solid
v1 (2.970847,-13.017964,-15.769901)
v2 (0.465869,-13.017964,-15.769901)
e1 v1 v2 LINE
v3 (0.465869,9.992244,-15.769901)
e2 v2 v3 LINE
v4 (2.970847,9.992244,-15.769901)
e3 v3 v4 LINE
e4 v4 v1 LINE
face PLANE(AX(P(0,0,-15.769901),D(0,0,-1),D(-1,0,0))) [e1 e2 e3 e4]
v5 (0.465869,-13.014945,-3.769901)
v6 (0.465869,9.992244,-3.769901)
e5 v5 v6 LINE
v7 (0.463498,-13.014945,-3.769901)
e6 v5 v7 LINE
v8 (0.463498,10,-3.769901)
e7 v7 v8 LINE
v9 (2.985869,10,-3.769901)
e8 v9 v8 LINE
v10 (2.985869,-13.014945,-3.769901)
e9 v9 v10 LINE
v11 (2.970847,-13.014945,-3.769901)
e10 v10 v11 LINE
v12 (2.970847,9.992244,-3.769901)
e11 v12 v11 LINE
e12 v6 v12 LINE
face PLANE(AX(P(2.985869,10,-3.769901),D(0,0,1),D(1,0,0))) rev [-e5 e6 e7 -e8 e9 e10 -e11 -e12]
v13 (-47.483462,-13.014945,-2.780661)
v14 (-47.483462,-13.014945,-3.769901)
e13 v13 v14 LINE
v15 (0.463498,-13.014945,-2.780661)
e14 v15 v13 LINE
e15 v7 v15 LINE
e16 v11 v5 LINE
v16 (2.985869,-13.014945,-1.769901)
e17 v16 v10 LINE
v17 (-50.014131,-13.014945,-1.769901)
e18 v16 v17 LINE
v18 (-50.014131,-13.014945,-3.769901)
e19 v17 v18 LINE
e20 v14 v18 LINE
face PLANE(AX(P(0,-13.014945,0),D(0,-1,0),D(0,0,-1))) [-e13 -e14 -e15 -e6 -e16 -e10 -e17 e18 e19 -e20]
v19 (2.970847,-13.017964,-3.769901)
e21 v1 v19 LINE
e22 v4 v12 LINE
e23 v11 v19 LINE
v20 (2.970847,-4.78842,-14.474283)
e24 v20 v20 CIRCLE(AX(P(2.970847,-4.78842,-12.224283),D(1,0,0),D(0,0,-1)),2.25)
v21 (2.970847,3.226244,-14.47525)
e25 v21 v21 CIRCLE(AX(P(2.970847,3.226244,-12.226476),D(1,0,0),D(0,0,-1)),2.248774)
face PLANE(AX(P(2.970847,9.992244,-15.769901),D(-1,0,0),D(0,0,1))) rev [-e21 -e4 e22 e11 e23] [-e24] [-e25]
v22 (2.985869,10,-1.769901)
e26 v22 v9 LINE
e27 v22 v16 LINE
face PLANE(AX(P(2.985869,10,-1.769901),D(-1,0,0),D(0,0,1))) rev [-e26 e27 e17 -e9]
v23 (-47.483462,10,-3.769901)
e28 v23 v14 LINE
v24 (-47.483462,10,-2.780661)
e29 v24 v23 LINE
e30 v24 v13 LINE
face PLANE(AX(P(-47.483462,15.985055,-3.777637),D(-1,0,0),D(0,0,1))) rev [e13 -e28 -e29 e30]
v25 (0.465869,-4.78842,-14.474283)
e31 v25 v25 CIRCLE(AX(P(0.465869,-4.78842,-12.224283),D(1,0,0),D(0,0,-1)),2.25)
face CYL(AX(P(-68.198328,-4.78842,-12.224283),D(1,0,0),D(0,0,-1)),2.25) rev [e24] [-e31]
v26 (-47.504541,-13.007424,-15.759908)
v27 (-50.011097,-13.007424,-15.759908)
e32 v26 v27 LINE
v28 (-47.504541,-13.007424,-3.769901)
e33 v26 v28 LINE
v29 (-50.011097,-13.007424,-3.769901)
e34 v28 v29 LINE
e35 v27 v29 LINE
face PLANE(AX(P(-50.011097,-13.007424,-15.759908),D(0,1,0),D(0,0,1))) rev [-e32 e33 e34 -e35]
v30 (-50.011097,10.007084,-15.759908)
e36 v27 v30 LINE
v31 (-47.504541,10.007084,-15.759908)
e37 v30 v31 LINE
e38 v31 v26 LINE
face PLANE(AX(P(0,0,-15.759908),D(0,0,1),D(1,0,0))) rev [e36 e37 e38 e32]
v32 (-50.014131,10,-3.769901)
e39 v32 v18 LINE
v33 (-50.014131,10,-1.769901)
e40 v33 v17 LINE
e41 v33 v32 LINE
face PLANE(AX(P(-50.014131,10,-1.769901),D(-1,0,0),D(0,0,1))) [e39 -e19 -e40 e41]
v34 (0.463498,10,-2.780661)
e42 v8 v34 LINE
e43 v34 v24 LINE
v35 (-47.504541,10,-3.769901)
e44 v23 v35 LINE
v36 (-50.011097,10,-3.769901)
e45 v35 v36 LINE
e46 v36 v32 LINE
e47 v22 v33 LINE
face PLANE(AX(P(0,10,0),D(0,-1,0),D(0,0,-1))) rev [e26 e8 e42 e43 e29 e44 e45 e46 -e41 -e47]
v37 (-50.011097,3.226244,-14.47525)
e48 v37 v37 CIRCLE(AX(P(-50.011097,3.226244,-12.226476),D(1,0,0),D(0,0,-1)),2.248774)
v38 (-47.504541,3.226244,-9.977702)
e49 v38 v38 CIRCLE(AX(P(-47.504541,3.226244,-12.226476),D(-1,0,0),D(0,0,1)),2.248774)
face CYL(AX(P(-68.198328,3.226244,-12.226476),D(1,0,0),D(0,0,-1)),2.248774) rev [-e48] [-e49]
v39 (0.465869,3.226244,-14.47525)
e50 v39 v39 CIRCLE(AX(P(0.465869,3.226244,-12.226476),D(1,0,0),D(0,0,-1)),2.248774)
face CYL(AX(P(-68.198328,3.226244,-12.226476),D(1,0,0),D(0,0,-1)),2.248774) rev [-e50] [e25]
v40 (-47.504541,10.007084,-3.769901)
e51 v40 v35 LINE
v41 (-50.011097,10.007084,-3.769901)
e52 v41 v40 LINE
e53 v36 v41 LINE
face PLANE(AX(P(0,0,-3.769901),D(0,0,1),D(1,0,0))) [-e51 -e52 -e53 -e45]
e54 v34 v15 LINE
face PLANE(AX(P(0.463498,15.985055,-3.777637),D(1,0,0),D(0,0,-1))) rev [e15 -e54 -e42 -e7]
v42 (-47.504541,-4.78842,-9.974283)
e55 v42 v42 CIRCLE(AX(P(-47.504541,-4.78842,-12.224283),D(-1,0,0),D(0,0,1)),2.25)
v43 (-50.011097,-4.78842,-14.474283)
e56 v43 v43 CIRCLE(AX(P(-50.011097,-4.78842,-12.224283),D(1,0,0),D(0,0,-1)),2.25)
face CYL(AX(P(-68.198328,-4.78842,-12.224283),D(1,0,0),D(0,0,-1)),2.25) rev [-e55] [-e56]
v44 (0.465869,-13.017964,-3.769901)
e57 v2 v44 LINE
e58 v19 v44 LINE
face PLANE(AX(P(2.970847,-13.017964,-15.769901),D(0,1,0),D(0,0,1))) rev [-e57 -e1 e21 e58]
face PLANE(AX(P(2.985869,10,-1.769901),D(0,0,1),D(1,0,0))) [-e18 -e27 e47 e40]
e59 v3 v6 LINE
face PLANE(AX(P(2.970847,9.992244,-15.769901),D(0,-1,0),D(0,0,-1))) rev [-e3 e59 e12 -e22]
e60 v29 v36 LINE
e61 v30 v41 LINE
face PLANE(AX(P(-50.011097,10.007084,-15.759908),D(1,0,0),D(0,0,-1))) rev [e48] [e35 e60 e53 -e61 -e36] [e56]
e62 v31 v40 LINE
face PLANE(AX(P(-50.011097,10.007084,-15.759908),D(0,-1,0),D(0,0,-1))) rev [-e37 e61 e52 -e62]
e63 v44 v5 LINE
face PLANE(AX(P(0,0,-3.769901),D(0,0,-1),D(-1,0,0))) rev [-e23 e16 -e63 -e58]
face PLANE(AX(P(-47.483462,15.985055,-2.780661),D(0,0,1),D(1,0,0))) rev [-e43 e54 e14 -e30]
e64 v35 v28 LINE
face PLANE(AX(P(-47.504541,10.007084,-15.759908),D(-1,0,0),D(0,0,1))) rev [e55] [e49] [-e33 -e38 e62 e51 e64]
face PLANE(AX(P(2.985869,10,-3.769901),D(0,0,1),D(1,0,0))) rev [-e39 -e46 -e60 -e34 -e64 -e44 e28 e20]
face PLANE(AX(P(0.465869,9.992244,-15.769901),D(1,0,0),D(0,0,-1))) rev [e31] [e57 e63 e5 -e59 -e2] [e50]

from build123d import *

# Parameters (mm, degrees)
BOSS_EXTRUDE3_DEPTH       = 10
BOSS_EXTRUDE3_DEPTH_BACK  = 13.014944575
SKETCH1_W                 = 53
SKETCH1_H                 = 2
SKETCH2_W                 = 2.504977783
SKETCH2_H                 = 23.010208786
BOSS_EXTRUDE4_DEPTH       = 12
SKETCH3_W                 = 2.506556419
SKETCH3_H                 = 23.01450768
BOSS_EXTRUDE5_DEPTH       = 11.990007083
BOSS_EXTRUDE6_START       = -52.981944033
BOSS_EXTRUDE6_OUTLINE_R   = 2.248774255
BOSS_EXTRUDE6_OUTLINE_R_2 = 2.25
BOSS_EXTRUDE6_DEPTH       = 52.981944033
SKETCH6_W                 = 47.946959802
SKETCH6_H                 = 0.996975491
CUT_EXTRUDE2_DEPTH        = 29


# Read off the part's stored shape, not the designer's step: Boss-Extrude6
with BuildPart() as part:
    # Sketch1 → Boss-Extrude3 (new, two sides: drawn at the far end of the back side and taken through both)
    with BuildSketch(Plane(origin=(0, 0, 0), x_dir=(1, 0, 0), z_dir=(0, 1, 0)).offset(-BOSS_EXTRUDE3_DEPTH_BACK)):
        with Locations((-23.514130948, 2.769901189)):
            Rectangle(SKETCH1_W, SKETCH1_H)
    extrude(amount=BOSS_EXTRUDE3_DEPTH + BOSS_EXTRUDE3_DEPTH_BACK)

    # Sketch2 → Boss-Extrude4 (add)
    with BuildSketch(Plane(origin=(-2.522360337, 0, -3.769901189), x_dir=(-1, 0, 0), z_dir=(0, 0, -1))):
        with Locations((-4.240718342, -1.512860106)):
            Rectangle(SKETCH2_W, SKETCH2_H)
    extrude(amount=BOSS_EXTRUDE4_DEPTH)

    # Sketch3 → Boss-Extrude5 (add)
    with BuildSketch(Plane(origin=(0, 0, -3.769901189), x_dir=(-1, 0, 0), z_dir=(0, 0, -1))):
        with Locations((48.757818929, -1.500170116)):
            Rectangle(SKETCH3_W, SKETCH3_H)
    extrude(amount=BOSS_EXTRUDE5_DEPTH)

    # Boss-Extrude6 outline → Boss-Extrude6 (cut)
    with BuildSketch(Plane(origin=(2.970846895, 0, 0), x_dir=(0, 0, -1), z_dir=(1, 0, 0)).offset(BOSS_EXTRUDE6_START)):
        with Locations((12.226476123, 3.226243709)):
            Circle(BOSS_EXTRUDE6_OUTLINE_R)
        with Locations((12.224283194, -4.788420336)):
            Circle(BOSS_EXTRUDE6_OUTLINE_R_2)
    extrude(amount=BOSS_EXTRUDE6_DEPTH, mode=Mode.SUBTRACT)

    # Sketch6 → Cut-Extrude2 (cut)
    with BuildSketch(Plane(origin=(0, -13.014944575, 0), x_dir=(-1, 0, 0), z_dir=(0, -1, 0))):
        with Locations((23.509982369, 3.279148845)):
            Rectangle(SKETCH6_W, SKETCH6_H)
    extrude(amount=-CUT_EXTRUDE2_DEPTH, mode=Mode.SUBTRACT)


solid = part.part
